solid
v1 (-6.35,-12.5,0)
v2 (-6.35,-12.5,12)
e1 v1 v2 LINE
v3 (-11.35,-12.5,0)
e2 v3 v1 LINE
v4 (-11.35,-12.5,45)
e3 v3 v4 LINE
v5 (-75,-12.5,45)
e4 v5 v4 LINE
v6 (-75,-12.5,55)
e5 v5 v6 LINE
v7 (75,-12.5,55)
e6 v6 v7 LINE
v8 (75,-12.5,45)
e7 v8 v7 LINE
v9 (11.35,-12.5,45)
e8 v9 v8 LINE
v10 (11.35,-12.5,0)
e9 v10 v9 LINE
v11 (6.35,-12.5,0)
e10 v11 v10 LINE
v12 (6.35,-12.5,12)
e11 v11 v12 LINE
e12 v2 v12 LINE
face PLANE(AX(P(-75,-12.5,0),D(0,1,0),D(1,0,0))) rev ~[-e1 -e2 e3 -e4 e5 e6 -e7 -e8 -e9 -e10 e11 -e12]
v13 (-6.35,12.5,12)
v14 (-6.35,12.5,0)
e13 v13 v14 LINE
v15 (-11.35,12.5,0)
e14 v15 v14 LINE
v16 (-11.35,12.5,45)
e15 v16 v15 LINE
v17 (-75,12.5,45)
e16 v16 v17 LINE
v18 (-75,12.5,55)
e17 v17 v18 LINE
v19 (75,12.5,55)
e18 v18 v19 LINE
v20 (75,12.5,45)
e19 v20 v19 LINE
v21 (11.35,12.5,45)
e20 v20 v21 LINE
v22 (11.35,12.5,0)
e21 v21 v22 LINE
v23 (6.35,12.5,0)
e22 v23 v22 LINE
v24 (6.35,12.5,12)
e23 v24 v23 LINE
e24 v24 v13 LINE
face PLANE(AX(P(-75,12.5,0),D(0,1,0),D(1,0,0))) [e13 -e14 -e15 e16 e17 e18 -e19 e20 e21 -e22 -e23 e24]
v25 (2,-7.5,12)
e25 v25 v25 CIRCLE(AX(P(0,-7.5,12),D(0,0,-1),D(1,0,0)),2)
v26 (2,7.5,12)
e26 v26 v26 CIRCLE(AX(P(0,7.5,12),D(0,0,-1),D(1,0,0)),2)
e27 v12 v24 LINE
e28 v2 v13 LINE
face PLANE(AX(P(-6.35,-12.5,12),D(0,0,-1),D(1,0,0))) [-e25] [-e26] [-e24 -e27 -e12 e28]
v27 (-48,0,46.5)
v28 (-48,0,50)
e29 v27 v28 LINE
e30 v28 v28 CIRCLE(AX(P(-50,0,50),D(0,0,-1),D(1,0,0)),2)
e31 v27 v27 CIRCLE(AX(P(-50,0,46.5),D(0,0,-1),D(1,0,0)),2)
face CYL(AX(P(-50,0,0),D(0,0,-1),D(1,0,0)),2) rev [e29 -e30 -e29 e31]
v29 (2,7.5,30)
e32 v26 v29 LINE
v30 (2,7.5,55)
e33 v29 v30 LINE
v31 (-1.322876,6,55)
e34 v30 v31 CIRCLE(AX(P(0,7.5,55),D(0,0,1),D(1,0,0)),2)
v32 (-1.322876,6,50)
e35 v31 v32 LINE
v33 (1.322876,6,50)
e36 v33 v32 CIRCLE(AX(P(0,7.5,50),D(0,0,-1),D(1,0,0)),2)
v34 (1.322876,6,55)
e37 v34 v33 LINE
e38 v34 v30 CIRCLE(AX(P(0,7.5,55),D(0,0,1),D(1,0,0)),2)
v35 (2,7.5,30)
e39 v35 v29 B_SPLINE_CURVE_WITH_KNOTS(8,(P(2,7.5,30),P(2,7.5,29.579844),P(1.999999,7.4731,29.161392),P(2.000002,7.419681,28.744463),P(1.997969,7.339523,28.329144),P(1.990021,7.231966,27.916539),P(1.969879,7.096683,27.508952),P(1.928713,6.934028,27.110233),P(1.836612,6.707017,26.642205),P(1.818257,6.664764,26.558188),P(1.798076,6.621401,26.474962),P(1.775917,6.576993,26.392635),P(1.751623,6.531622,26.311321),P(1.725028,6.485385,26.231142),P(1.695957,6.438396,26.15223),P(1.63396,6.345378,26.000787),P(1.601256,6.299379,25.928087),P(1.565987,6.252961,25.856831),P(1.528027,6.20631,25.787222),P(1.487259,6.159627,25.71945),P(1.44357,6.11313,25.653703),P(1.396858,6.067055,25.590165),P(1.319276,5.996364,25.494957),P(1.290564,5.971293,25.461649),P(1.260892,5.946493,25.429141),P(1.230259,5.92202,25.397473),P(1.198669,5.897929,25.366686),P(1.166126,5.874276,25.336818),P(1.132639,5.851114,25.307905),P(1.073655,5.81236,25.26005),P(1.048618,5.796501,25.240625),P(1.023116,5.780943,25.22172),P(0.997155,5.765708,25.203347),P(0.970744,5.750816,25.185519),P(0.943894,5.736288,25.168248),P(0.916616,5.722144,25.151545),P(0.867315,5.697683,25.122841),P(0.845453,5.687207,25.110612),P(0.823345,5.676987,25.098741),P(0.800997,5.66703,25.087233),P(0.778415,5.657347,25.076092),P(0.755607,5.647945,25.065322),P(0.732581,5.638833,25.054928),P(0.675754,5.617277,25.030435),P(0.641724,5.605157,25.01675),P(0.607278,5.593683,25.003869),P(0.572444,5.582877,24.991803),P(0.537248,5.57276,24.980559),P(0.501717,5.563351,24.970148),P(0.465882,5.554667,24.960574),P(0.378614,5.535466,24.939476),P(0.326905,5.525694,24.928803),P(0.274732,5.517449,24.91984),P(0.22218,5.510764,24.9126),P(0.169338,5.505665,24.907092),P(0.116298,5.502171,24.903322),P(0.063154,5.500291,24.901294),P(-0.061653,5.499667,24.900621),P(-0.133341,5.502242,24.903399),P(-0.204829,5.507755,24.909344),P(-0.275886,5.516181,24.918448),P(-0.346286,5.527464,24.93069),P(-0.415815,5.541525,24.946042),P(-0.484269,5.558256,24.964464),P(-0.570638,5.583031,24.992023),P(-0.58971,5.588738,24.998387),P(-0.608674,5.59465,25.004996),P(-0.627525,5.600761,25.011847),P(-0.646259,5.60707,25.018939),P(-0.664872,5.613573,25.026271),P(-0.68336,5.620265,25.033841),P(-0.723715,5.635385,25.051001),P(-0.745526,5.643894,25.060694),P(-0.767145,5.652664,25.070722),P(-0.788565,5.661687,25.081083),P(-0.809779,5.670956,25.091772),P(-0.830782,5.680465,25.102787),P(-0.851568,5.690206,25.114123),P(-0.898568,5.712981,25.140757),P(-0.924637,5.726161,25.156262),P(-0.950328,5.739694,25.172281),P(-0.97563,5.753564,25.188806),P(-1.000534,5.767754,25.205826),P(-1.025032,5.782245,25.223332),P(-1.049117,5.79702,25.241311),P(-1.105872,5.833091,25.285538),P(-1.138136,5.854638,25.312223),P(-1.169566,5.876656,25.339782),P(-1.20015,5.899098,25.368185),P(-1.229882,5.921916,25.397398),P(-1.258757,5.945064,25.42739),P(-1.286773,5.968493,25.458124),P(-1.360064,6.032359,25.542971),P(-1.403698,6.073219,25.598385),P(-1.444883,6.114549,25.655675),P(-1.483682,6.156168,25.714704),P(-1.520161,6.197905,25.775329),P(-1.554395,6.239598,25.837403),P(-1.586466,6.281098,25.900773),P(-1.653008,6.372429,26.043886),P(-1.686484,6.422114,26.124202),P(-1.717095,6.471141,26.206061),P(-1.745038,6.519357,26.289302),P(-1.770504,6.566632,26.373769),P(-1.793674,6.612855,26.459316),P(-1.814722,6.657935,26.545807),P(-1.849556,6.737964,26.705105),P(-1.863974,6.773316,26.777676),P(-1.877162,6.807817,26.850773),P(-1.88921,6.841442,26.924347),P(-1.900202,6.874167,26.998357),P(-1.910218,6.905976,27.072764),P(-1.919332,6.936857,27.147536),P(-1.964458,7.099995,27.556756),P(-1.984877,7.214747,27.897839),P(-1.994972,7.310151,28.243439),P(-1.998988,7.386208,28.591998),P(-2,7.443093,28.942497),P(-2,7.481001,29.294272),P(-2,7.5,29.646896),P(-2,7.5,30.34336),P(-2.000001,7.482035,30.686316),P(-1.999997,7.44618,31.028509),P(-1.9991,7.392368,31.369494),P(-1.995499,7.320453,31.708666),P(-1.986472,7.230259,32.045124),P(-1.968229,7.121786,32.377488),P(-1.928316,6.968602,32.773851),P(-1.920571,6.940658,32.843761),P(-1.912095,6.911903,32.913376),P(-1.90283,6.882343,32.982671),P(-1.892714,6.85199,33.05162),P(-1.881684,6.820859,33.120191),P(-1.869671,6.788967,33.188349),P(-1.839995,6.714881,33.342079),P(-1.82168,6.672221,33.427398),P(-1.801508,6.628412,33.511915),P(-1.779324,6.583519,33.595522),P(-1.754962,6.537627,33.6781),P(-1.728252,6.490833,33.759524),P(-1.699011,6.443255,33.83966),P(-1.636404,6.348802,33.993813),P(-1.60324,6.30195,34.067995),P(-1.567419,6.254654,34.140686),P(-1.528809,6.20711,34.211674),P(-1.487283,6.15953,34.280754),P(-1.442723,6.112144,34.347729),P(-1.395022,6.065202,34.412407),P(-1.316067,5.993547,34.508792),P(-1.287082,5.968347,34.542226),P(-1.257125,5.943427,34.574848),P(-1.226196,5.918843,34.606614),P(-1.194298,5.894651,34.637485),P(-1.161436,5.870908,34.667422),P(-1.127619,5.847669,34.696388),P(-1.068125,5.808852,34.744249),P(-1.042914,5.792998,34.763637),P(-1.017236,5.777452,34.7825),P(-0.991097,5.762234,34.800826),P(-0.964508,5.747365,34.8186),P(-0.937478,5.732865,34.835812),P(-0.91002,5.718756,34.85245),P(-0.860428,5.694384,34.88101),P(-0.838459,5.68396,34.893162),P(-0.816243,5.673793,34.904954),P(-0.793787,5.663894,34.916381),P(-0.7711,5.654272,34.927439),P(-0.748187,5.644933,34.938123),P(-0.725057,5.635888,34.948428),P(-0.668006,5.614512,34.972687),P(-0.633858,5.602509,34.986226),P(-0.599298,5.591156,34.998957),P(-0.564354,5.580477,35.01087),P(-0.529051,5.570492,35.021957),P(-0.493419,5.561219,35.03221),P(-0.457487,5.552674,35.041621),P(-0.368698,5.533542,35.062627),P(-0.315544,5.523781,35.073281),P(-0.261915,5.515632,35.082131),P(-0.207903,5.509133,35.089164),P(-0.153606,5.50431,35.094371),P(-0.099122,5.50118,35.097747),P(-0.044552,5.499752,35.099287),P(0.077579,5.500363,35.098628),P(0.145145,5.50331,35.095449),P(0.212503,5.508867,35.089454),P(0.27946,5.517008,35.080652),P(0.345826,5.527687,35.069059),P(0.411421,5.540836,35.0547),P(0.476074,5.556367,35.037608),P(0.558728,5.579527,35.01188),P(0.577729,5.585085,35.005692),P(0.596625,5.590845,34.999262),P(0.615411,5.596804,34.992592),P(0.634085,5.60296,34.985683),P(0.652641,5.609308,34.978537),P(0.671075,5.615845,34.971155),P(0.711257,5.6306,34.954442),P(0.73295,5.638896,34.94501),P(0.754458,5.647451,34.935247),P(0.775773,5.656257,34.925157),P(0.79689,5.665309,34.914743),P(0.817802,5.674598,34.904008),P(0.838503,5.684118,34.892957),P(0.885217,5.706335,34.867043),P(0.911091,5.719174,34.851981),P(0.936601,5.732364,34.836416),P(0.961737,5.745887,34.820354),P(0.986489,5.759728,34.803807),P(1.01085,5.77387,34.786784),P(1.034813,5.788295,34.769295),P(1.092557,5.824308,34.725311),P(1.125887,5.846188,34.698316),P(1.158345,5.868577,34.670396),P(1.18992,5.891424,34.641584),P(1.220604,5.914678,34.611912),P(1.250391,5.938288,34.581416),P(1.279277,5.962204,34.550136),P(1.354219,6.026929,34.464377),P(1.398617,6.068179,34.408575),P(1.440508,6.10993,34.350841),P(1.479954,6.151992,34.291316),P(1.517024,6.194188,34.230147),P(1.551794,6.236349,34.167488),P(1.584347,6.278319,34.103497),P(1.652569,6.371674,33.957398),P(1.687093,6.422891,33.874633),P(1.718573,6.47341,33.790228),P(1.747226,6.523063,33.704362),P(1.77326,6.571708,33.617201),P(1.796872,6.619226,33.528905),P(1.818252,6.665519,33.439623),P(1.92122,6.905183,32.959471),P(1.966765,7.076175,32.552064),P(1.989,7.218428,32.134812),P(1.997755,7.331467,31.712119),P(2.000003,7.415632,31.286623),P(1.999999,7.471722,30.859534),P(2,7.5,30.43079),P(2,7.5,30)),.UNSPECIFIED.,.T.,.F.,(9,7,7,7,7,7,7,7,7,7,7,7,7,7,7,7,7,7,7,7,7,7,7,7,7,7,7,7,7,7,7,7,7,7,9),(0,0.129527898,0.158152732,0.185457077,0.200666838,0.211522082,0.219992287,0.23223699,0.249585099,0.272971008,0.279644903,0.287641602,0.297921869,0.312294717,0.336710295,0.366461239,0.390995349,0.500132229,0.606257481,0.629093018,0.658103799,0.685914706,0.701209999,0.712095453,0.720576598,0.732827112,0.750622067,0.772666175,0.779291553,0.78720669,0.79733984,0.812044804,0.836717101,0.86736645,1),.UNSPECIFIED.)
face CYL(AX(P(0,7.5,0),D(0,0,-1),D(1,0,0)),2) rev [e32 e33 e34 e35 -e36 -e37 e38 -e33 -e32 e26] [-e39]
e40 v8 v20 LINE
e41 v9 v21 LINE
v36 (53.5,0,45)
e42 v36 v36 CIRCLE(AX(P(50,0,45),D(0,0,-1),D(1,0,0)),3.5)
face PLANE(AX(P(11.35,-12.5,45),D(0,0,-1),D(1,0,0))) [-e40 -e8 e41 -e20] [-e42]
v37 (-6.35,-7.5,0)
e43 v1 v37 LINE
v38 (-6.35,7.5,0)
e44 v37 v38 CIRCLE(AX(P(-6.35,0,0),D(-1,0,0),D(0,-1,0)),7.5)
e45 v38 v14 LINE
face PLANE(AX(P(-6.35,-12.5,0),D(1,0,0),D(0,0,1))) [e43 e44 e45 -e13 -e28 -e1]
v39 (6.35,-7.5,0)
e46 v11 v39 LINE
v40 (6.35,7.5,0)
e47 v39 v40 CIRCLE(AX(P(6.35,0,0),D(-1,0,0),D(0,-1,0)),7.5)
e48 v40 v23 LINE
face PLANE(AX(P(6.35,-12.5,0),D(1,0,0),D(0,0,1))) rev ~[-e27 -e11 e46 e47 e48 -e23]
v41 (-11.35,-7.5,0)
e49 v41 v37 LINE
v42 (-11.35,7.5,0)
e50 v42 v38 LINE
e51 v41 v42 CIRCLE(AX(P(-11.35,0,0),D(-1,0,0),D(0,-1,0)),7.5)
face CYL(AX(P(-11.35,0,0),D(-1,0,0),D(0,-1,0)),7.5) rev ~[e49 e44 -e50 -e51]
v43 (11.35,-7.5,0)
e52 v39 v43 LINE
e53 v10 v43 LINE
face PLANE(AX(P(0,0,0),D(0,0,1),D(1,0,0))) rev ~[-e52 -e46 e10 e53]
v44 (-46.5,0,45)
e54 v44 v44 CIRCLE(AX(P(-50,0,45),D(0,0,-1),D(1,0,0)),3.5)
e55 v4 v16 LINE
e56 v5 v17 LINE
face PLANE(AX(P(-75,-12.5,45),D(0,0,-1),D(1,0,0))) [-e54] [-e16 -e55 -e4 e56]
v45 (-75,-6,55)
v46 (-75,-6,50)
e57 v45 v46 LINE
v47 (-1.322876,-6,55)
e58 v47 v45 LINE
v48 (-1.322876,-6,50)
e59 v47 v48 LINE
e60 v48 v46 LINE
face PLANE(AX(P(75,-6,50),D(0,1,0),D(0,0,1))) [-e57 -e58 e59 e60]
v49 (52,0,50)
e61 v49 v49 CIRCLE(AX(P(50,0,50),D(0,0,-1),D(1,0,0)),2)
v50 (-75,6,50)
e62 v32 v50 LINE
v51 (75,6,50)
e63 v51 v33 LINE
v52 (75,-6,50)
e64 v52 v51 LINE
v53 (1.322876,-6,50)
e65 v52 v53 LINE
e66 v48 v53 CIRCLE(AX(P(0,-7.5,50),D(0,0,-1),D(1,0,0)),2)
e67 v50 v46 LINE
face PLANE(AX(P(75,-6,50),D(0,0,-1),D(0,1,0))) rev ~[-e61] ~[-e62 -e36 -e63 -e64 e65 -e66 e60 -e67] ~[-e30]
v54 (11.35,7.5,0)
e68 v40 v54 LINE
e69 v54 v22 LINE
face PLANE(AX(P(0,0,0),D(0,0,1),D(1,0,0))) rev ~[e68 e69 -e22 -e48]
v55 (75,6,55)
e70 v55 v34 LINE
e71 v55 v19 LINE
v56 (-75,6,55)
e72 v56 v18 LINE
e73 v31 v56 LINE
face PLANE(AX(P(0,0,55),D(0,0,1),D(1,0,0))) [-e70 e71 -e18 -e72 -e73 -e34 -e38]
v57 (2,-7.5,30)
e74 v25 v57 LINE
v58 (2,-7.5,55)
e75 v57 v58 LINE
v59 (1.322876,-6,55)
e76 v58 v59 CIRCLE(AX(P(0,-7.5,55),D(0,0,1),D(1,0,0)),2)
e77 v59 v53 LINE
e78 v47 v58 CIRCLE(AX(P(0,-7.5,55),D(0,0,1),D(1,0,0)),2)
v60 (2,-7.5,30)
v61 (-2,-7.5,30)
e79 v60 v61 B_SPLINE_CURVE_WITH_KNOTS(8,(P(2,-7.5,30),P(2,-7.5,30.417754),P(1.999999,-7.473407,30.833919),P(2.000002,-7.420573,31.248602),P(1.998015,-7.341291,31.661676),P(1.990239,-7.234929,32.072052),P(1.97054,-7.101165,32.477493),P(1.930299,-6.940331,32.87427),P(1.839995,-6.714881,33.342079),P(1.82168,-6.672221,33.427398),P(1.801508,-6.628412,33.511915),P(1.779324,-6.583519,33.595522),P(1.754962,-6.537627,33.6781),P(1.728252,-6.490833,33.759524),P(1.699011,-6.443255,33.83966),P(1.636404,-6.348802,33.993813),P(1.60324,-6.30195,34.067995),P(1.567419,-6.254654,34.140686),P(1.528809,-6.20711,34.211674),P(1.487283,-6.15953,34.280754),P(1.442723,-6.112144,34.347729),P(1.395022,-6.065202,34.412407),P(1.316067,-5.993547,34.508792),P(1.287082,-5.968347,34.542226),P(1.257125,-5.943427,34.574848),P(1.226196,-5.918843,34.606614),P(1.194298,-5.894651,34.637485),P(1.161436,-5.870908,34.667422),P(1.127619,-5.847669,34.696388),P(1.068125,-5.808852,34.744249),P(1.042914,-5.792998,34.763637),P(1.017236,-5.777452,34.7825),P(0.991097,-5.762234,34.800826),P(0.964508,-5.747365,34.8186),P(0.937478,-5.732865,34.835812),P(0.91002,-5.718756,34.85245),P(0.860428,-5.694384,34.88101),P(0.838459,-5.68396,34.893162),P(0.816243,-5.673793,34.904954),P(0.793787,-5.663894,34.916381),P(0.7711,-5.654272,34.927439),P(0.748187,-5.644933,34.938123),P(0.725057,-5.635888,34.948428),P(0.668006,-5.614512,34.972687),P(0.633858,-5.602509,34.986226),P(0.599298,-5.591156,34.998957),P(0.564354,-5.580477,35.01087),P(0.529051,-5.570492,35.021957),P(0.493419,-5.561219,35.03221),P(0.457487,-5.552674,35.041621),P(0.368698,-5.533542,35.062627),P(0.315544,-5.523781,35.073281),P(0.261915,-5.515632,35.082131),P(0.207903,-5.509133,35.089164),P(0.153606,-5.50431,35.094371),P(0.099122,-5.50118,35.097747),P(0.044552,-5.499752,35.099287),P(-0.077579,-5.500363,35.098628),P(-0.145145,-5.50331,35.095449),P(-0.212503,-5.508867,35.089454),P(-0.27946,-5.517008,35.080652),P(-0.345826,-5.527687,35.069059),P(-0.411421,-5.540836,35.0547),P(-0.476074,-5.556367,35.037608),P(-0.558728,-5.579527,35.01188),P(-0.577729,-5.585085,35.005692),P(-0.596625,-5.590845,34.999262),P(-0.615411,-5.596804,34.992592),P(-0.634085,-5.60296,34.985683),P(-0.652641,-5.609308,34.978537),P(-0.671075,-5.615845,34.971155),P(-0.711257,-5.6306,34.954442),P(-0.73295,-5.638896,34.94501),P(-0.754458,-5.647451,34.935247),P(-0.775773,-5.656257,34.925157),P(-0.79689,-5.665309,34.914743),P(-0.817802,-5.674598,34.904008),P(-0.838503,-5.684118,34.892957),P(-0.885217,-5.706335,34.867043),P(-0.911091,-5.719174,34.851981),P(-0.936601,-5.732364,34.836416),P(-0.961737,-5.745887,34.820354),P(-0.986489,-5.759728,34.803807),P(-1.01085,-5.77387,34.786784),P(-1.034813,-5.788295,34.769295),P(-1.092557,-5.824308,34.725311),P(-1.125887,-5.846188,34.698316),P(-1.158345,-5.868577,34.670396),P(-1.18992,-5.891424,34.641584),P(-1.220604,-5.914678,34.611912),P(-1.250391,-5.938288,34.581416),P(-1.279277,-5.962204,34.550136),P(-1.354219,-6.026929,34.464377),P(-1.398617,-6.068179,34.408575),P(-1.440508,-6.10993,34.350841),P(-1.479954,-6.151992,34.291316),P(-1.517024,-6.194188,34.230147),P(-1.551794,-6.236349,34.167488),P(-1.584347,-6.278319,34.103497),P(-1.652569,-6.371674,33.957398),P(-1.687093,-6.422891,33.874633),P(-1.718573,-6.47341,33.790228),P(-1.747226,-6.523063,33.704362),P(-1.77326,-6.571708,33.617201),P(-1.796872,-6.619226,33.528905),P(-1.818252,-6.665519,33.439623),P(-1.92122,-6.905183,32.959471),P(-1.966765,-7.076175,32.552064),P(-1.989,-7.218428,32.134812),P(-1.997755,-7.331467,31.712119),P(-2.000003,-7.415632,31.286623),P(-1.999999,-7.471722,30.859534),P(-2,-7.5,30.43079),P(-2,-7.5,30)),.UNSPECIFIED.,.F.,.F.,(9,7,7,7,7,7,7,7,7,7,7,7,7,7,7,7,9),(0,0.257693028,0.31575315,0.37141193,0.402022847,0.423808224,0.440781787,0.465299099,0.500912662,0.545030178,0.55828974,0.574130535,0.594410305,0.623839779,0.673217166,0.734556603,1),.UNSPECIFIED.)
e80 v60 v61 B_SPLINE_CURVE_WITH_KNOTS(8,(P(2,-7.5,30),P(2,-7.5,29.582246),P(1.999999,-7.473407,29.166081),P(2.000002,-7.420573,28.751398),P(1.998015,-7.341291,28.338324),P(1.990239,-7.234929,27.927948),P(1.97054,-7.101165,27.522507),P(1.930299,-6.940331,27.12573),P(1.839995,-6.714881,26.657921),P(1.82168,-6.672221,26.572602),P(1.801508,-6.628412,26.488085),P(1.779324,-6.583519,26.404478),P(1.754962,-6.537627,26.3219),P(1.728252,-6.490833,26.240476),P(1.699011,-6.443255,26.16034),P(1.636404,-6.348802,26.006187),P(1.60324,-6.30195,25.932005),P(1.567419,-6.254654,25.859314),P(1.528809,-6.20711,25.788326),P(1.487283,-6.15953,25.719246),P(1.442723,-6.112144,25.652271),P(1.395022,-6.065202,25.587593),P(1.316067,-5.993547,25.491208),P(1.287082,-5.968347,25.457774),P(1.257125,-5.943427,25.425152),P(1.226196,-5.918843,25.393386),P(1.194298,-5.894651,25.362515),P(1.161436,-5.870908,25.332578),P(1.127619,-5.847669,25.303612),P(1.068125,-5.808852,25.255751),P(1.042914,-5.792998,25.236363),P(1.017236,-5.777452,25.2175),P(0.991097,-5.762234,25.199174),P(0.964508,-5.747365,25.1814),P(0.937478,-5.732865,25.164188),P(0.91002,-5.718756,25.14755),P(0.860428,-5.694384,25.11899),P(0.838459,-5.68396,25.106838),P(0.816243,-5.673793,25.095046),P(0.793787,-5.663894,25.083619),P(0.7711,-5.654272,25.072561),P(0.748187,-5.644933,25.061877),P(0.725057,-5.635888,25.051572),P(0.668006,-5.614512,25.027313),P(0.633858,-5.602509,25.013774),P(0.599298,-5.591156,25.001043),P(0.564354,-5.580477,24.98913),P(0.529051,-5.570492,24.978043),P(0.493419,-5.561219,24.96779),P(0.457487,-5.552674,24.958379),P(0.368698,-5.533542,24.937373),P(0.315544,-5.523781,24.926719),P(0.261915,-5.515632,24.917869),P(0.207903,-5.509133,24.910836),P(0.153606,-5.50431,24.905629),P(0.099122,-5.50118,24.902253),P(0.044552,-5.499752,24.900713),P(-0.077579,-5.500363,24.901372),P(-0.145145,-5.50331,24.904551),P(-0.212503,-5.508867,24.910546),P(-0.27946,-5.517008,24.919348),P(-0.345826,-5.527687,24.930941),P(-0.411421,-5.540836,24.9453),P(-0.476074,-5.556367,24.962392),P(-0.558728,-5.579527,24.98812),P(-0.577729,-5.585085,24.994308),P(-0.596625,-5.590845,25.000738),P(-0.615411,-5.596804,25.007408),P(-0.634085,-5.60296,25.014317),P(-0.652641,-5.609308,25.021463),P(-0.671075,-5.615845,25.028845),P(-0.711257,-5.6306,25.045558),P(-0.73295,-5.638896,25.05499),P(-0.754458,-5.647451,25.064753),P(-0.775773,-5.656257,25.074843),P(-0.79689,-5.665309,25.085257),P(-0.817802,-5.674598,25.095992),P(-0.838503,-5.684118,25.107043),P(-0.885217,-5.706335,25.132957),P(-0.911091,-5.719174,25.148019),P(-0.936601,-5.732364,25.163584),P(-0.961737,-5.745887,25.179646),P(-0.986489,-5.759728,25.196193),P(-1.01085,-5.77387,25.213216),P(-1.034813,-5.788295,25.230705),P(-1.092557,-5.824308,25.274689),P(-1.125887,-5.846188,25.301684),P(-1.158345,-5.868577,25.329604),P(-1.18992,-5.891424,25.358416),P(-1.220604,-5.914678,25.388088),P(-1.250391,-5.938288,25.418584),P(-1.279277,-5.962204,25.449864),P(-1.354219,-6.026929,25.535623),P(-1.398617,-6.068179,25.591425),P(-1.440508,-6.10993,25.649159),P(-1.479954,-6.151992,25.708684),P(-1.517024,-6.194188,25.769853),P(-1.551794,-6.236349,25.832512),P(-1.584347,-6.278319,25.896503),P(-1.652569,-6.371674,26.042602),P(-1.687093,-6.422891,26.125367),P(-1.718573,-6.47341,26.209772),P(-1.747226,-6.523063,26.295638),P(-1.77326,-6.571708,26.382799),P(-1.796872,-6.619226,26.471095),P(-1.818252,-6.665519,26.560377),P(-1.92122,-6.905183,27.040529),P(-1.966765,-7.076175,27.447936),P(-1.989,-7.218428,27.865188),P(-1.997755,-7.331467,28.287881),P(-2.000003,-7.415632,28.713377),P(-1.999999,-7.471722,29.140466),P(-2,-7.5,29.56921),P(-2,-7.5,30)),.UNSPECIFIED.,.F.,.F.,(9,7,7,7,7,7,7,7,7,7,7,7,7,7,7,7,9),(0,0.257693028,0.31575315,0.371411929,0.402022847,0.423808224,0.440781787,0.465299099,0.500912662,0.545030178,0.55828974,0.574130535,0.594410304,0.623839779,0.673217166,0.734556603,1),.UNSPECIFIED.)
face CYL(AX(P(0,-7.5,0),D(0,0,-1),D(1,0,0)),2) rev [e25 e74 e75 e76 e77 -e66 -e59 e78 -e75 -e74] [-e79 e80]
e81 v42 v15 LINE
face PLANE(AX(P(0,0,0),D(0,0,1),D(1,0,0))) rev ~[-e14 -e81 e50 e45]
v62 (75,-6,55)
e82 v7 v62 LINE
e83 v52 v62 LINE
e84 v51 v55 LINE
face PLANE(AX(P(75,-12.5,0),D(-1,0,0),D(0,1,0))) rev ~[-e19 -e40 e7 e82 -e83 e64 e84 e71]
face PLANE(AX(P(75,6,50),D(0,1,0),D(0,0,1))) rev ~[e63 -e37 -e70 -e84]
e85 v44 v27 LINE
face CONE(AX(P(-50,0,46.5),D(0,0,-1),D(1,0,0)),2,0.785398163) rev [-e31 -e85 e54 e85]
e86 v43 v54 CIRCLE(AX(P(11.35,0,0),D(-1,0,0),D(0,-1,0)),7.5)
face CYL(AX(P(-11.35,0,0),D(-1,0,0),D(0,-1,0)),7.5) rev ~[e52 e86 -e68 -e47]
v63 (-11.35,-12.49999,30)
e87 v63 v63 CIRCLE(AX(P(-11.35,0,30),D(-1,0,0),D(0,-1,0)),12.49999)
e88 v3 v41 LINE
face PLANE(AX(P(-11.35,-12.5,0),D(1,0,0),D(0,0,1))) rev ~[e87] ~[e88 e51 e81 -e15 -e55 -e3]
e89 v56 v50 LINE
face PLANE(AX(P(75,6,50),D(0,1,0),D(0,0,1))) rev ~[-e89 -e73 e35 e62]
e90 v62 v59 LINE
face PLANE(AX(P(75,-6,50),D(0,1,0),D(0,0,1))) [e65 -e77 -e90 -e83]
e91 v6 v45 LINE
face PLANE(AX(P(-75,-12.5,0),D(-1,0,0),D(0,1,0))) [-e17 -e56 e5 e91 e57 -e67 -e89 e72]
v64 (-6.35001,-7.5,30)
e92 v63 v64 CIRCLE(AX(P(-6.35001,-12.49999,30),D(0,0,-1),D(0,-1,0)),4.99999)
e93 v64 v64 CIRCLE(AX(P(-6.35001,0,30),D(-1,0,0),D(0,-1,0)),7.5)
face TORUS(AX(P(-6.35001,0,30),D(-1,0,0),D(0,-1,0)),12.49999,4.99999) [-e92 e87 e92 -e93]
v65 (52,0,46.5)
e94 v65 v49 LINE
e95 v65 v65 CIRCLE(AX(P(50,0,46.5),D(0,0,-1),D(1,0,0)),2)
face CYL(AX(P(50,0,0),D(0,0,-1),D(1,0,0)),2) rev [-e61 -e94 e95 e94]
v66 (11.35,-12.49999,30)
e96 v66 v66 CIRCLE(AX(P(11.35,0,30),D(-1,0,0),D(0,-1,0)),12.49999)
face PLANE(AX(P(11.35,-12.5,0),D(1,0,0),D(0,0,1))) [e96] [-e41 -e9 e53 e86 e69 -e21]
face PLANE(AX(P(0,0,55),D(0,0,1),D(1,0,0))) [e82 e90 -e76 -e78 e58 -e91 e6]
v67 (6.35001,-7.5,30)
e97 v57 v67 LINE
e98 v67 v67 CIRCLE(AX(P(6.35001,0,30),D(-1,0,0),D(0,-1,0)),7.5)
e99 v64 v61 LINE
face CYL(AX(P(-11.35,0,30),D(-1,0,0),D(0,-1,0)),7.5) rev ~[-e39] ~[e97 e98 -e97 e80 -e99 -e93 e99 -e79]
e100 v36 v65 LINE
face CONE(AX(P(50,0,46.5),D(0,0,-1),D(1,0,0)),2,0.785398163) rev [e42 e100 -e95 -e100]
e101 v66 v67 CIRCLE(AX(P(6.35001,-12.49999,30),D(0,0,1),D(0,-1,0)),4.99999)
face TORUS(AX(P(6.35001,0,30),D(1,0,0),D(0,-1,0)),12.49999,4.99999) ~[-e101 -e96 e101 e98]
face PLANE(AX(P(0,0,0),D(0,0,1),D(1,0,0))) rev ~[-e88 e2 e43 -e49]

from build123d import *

# Parameters (mm, degrees)
F0_W     = 150
F0_H     = 25
F0_R     = 2
F1_DEPTH = 55
F2_W     = 12
F2_H     = 5
F3_DEPTH = 150.001
F4_W     = 63.65
F4_H     = 45
F4_W_2   = 12.7
F4_H_2   = 12
F5_DEPTH = 25.001
F7_DEPTH = 86.351
F6_R     = 7.5
F8_DEPTH = 86.351
F9_R     = 4.99999
F10_SIZE = 1.5


# Not quite as in the source:
# - a fillet or chamfer is up to 0.001 mm smaller than in the source, because OpenCascade refuses the exact size


with BuildPart() as f1:
    # F0 (on Top) → F1 (new body)
    with BuildSketch(Plane.XY):
        Rectangle(F0_W, F0_H)
        with Locations((0, -7.5)):
            Circle(F0_R, mode=Mode.SUBTRACT)
        with Locations((-50, 0)):
            Circle(F0_R, mode=Mode.SUBTRACT)
        with Locations((50, 0)):
            Circle(F0_R, mode=Mode.SUBTRACT)
        with Locations((0, 7.5)):
            Circle(F0_R, mode=Mode.SUBTRACT)
    extrude(amount=F1_DEPTH)

    # F2 (on face) → F3 (cut, through all)
    with BuildSketch(Plane.YZ.offset(75)):
        with Locations((0, 52.5)):
            Rectangle(F2_W, F2_H)
    extrude(amount=-F3_DEPTH, mode=Mode.SUBTRACT)

    # F4 (on face) → F5 (cut, through all)
    with BuildSketch(Plane.XZ.offset(12.5)):
        with Locations((43.175, 22.5)):
            Rectangle(F4_W, F4_H)
        with Locations((-43.175, 22.5)):
            Rectangle(F4_W, F4_H)
        with Locations((0, 6)):
            Rectangle(F4_W_2, F4_H_2)
    extrude(amount=-F5_DEPTH, mode=Mode.SUBTRACT)

    # F6 (on face) → F7 (cut, through all)
    with BuildSketch(Plane(origin=(-11.35, 0, 0), x_dir=(0, -1, 0), z_dir=(-1, 0, 0))):
        with BuildLine():
            Line((-7.5, 0), (7.5, 0))
            ThreePointArc((7.5, 0), (0, 7.5), (-7.5, 0))
        make_face()
    extrude(amount=-F7_DEPTH, mode=Mode.SUBTRACT)

    # F6 (on face) → F8 (cut, through all)
    with BuildSketch(Plane(origin=(-11.35, 0, 0), x_dir=(0, -1, 0), z_dir=(-1, 0, 0))):
        with Locations((0, 30)):
            Circle(F6_R)
    extrude(amount=-F8_DEPTH, mode=Mode.SUBTRACT)

    # F9 (radius 5 in the source; OpenCascade refuses exactly that, so slightly less here)
    f9_edges = [f1.edges().sort_by_distance(p)[0] for p in [
        (-11.35, 7.5, 30),
        (11.35, 7.5, 30),
    ]]
    fillet(f9_edges, radius=F9_R)

    # F10
    f10_edges = [f1.edges().sort_by_distance(p)[0] for p in [
        (48, 0, 45),
        (-52, 0, 45),
    ]]
    chamfer(f10_edges, length=F10_SIZE)


solid = f1.part
